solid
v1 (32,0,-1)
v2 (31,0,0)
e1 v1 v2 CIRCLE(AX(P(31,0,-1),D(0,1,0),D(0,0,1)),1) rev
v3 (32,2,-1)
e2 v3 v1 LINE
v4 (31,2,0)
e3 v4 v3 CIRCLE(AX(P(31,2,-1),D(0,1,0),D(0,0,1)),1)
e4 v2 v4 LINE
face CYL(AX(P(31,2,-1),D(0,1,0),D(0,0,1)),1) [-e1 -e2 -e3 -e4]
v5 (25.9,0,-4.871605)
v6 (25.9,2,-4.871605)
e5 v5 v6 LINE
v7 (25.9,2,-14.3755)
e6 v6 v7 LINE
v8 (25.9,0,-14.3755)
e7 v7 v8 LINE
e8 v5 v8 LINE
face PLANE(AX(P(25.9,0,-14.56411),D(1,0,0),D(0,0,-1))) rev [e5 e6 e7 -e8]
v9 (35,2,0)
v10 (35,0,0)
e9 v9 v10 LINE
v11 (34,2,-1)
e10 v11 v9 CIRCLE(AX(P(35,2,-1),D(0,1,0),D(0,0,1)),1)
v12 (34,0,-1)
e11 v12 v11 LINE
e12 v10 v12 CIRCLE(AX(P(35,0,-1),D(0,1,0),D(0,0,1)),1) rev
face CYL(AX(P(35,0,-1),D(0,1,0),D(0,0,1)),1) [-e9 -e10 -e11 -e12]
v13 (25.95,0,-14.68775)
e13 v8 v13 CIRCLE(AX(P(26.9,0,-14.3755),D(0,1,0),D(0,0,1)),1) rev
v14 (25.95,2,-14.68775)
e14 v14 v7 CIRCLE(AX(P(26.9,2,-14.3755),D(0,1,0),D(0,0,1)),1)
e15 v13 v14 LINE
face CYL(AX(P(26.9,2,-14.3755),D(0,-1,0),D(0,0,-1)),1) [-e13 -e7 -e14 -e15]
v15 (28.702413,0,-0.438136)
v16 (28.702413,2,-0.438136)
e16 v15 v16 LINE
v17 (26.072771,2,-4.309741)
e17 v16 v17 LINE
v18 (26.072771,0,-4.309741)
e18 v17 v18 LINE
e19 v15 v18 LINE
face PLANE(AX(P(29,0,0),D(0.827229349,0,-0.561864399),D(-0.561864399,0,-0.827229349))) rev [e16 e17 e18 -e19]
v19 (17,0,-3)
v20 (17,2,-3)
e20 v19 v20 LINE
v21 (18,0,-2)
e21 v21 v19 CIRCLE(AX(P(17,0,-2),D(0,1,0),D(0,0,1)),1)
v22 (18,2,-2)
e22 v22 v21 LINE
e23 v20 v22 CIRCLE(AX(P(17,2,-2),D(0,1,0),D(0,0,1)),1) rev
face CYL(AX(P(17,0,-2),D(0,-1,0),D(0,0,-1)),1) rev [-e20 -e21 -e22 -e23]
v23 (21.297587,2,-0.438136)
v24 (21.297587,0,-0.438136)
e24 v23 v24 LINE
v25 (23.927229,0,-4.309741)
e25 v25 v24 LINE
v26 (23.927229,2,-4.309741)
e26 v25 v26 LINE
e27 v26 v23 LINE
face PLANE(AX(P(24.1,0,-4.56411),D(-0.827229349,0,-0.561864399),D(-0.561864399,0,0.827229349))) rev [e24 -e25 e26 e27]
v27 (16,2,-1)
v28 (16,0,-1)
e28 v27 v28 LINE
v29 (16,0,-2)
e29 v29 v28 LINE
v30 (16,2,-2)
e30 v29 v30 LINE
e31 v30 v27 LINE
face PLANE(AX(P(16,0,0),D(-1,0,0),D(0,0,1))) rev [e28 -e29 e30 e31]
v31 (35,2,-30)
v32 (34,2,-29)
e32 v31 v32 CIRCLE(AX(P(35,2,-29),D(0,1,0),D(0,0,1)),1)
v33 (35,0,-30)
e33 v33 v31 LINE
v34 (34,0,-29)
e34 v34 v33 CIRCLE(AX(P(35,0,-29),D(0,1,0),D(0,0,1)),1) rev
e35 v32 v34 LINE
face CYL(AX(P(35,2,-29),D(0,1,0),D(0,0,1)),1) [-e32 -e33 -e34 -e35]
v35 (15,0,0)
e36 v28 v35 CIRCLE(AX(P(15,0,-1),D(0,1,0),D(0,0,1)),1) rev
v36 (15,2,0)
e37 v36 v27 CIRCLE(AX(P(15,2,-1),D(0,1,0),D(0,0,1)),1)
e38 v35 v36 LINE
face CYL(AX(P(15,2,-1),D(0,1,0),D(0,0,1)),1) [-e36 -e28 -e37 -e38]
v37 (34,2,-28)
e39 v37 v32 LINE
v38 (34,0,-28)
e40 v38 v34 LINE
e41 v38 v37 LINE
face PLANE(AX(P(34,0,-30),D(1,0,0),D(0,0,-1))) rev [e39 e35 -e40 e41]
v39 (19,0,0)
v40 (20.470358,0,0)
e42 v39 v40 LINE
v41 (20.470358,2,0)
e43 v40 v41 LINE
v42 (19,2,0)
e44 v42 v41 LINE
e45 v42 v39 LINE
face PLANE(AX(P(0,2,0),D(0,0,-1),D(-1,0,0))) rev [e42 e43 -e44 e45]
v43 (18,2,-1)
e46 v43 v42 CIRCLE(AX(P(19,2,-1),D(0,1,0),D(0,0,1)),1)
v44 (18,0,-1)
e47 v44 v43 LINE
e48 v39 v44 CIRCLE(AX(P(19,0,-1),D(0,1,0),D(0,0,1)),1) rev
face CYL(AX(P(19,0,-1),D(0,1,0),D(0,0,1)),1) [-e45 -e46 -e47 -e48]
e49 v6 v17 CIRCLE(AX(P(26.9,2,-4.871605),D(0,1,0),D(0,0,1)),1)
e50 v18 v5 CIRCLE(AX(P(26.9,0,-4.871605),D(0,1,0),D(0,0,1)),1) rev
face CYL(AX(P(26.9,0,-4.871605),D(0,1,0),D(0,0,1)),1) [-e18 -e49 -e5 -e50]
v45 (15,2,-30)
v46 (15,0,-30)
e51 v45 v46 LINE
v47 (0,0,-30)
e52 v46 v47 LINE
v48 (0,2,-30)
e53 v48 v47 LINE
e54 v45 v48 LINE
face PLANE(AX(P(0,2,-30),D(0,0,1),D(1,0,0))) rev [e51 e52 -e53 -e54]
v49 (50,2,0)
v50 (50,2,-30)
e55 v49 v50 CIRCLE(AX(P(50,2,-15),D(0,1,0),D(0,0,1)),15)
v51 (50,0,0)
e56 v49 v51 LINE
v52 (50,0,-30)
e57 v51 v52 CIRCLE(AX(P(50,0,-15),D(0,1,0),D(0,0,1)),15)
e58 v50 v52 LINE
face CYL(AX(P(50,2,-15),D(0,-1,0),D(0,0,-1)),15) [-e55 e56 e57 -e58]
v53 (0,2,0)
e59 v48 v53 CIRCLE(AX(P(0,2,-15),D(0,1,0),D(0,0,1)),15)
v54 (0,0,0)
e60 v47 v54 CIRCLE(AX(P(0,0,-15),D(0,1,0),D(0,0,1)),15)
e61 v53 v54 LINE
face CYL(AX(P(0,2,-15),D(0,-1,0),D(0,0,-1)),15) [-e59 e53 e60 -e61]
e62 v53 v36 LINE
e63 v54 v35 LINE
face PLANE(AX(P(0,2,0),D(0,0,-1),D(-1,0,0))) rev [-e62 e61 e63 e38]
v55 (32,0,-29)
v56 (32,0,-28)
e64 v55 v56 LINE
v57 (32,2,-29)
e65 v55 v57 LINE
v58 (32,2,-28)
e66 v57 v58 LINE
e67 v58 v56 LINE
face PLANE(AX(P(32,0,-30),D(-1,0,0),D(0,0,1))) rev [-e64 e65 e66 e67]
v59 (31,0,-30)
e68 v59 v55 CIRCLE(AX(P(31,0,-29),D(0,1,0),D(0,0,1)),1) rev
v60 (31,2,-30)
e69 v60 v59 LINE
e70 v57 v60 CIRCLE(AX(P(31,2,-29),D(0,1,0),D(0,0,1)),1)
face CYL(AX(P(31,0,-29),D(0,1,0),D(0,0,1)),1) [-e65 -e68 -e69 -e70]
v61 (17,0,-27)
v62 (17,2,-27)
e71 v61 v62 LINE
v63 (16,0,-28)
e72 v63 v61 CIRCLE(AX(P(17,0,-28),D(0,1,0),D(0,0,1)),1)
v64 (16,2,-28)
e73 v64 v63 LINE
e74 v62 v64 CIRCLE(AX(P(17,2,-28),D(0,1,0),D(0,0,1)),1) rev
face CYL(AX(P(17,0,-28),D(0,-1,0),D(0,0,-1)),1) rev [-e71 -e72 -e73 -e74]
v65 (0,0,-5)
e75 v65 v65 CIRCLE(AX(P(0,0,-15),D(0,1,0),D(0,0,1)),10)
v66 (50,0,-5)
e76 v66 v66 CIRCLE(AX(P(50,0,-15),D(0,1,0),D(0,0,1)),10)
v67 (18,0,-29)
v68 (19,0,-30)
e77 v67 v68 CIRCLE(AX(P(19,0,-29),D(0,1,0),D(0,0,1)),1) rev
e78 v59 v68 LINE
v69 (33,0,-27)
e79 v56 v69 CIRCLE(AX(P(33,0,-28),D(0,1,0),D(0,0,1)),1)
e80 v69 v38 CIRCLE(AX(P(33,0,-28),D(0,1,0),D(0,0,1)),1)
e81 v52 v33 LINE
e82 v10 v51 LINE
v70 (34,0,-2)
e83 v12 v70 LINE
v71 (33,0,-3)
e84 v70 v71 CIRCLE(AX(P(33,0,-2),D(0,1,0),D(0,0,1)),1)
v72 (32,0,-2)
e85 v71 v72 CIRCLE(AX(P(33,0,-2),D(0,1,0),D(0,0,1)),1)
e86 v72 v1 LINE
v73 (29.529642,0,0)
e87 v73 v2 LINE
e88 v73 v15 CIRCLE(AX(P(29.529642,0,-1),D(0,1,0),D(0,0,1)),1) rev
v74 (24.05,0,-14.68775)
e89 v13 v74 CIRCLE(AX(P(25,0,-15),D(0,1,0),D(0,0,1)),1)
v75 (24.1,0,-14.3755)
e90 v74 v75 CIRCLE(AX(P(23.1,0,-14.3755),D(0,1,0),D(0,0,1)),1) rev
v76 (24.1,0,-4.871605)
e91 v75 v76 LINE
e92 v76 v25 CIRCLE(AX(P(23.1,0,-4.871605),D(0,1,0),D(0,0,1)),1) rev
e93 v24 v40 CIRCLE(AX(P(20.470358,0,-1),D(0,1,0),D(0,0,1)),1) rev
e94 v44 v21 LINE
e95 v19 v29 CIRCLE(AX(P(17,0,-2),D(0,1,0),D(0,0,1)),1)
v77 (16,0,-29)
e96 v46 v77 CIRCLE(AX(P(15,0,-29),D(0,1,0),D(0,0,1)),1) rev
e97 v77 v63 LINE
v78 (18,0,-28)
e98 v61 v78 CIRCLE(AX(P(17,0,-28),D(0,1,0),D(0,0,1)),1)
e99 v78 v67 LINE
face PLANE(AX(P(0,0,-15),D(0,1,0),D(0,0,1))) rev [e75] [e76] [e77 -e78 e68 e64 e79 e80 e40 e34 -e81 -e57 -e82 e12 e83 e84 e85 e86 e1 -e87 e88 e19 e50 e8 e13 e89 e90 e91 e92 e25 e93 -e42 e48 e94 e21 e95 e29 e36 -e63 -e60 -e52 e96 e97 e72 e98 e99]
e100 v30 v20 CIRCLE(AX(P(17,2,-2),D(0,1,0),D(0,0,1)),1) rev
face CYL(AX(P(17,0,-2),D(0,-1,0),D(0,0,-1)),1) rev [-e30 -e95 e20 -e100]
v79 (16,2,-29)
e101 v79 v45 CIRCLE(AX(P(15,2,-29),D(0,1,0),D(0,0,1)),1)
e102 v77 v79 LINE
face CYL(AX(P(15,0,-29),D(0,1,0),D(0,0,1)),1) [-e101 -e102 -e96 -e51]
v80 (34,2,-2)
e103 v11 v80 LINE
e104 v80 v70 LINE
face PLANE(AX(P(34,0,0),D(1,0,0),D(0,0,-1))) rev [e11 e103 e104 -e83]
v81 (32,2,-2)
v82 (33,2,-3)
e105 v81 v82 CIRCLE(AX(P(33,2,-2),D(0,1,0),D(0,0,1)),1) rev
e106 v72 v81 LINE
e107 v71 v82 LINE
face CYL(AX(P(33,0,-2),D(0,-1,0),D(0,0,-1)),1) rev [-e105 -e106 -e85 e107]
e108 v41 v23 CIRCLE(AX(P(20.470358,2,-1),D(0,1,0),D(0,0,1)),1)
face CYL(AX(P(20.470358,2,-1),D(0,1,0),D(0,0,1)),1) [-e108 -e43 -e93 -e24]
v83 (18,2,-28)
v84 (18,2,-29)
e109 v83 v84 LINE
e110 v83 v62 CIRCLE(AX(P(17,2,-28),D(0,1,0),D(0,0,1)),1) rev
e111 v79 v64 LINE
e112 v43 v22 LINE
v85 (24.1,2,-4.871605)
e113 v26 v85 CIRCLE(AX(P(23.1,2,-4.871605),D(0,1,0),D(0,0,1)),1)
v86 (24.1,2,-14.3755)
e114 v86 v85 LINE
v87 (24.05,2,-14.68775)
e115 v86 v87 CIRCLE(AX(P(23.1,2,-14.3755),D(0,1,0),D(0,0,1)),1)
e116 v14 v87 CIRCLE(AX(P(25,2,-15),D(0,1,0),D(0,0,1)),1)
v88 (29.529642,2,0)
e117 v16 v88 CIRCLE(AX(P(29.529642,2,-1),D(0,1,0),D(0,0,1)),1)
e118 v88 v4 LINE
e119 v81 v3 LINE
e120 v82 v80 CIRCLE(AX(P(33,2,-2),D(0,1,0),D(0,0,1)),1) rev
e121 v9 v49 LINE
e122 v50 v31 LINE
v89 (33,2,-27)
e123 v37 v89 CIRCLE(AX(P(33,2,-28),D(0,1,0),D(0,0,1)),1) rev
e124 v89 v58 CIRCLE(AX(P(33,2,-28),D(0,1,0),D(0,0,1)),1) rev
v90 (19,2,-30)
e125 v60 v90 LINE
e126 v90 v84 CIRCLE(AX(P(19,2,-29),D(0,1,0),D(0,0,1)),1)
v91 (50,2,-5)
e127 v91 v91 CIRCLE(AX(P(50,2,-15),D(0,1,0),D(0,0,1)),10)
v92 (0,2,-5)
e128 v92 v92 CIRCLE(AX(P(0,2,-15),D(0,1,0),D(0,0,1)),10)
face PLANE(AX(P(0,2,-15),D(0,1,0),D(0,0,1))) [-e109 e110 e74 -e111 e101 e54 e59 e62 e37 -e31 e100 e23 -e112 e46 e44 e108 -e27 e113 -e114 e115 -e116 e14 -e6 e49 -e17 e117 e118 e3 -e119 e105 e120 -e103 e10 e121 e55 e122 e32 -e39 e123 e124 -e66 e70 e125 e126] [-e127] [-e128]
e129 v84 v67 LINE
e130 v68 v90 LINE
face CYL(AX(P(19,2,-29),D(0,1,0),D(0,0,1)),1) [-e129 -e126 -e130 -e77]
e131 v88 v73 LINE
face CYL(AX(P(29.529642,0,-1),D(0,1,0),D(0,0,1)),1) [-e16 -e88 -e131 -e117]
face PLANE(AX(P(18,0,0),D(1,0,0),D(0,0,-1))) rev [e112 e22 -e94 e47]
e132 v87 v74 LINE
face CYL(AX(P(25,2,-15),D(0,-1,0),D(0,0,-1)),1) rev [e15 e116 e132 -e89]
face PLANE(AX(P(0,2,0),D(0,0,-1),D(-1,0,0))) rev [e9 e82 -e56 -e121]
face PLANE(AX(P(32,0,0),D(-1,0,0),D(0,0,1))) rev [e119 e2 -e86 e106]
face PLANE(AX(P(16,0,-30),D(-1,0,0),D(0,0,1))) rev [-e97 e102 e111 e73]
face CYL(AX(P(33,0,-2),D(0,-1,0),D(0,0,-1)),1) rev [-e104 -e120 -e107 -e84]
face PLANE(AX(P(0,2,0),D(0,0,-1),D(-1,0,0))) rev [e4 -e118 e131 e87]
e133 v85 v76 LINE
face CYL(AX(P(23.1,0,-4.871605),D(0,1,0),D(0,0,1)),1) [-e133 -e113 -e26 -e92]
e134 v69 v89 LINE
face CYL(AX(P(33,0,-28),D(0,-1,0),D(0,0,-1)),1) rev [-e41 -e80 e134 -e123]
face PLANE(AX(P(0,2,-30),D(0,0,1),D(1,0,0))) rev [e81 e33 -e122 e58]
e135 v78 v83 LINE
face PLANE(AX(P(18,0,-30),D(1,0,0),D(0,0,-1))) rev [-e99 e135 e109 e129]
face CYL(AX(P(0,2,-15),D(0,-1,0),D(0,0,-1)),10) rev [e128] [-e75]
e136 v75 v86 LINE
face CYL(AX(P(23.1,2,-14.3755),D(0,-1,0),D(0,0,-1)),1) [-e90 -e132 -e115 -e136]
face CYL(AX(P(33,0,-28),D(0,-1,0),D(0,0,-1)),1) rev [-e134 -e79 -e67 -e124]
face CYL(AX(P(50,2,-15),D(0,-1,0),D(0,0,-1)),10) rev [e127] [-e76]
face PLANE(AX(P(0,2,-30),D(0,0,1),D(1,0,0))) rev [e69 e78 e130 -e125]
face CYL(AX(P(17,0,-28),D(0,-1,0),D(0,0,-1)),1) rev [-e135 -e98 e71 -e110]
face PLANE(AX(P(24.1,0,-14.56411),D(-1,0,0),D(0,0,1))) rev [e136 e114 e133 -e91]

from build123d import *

# Parameters (mm, degrees)
SKETCH1_R           = 10
SKETCH1_R_2         = 1
BOSS_EXTRUDE1_DEPTH = 2
SKETCH2_W           = 2
SKETCH2_H           = 3
CUT_EXTRUDE1_DEPTH  = 72.617037079
FILLET1_START       = -1
FILLET1_DEPTH       = 4
FILLET1_2_DEPTH     = 2
CUT_EXTRUDE2_DEPTH  = 72.617037079
FILLET2_R           = 1


with BuildPart() as part:
    # Sketch1 → Boss-Extrude1 (new body)
    with BuildSketch(Plane(origin=(0, 0, 0), x_dir=(1, 0, 0), z_dir=(0, 1, 0))):
        with BuildLine():
            Line((0, 0), (50, 0))
            ThreePointArc((50, 0), (65, 15), (50, 30))
            Line((50, 30), (0, 30))
            ThreePointArc((0, 30), (-15, 15), (0, 0))
        make_face()
        with Locations(Location((0, 15, 0), (0, 0, 270))):
            Circle(SKETCH1_R, mode=Mode.SUBTRACT)
        with Locations(Location((50, 15, 0), (0, 0, 270))):
            Circle(SKETCH1_R, mode=Mode.SUBTRACT)
        with Locations(Location((25, 15, 0), (0, 0, 270))):
            Circle(SKETCH1_R_2, mode=Mode.SUBTRACT)
    extrude(amount=BOSS_EXTRUDE1_DEPTH)

    # Sketch2 → Cut-Extrude1 (cut, through all)
    with BuildSketch(Plane(origin=(0, 2, 0), x_dir=(1, 0, 0), z_dir=(0, 1, 0))):
        with Locations((17, 28.5)):
            Rectangle(SKETCH2_W, SKETCH2_H)
        with Locations((33, 28.5)):
            Rectangle(SKETCH2_W, SKETCH2_H)
        with Locations((17, 1.5)):
            Rectangle(SKETCH2_W, SKETCH2_H)
        with Locations((33, 1.5)):
            Rectangle(SKETCH2_W, SKETCH2_H)
    extrude(amount=-CUT_EXTRUDE1_DEPTH, mode=Mode.SUBTRACT)

    # Fillet1: read off the stored shape, not the designer's step
    # Fillet1 outline → Fillet1 (cut)
    with BuildSketch(Plane(origin=(0, 0, 0), x_dir=(1, 0, 0), z_dir=(0, 1, 0)).offset(FILLET1_START)):
        with BuildLine():
            ThreePointArc((35, 0), (34.292893219, 0.292893219), (34, 1))
            Line((34, 1), (34, 0))
            Line((34, 0), (35, 0))
        make_face()
        with BuildLine():
            ThreePointArc((32, 1), (31.707106781, 0.292893219), (31, 0))
            Line((31, 0), (32, 0))
            Line((32, 0), (32, 1))
        make_face()
        with BuildLine():
            ThreePointArc((19, 0), (18.292893219, 0.292893219), (18, 1))
            Line((18, 1), (18, 0))
            Line((18, 0), (19, 0))
        make_face()
        with BuildLine():
            ThreePointArc((16, 1), (15.707106781, 0.292893219), (15, 0))
            Line((15, 0), (16, 0))
            Line((16, 0), (16, 1))
        make_face()
        with BuildLine():
            ThreePointArc((15, 30), (15.707106781, 29.707106781), (16, 29))
            Line((16, 29), (16, 30))
            Line((16, 30), (15, 30))
        make_face()
        with BuildLine():
            ThreePointArc((18, 29), (18.292893219, 29.707106781), (19, 30))
            Line((19, 30), (18, 30))
            Line((18, 30), (18, 29))
        make_face()
        with BuildLine():
            ThreePointArc((31, 30), (31.707106781, 29.707106781), (32, 29))
            Line((32, 29), (32, 30))
            Line((32, 30), (31, 30))
        make_face()
        with BuildLine():
            ThreePointArc((34, 29), (34.292893219, 29.707106781), (35, 30))
            Line((35, 30), (34, 30))
            Line((34, 30), (34, 29))
        make_face()
    extrude(amount=FILLET1_DEPTH, mode=Mode.SUBTRACT)

    # Fillet1 2 outline → Fillet1 2 (add)
    with BuildSketch(Plane(origin=(0, 0, 0), x_dir=(1, 0, 0), z_dir=(0, 1, 0))):
        with BuildLine():
            Line((34, 3), (33, 3))
            ThreePointArc((33, 3), (33.707106781, 2.707106781), (34, 2))
            Line((34, 2), (34, 3))
        make_face()
        with BuildLine():
            Line((32, 3), (32, 2))
            ThreePointArc((32, 2), (32.292893219, 2.707106781), (33, 3))
            Line((33, 3), (32, 3))
        make_face()
        with BuildLine():
            Line((18, 3), (17, 3))
            ThreePointArc((17, 3), (17.707106781, 2.707106781), (18, 2))
            Line((18, 2), (18, 3))
        make_face()
        with BuildLine():
            Line((16, 3), (16, 2))
            ThreePointArc((16, 2), (16.292893219, 2.707106781), (17, 3))
            Line((17, 3), (16, 3))
        make_face()
        with BuildLine():
            Line((16, 27), (17, 27))
            ThreePointArc((17, 27), (16.292893219, 27.292893219), (16, 28))
            Line((16, 28), (16, 27))
        make_face()
        with BuildLine():
            Line((18, 27), (18, 28))
            ThreePointArc((18, 28), (17.707106781, 27.292893219), (17, 27))
            Line((17, 27), (18, 27))
        make_face()
        with BuildLine():
            Line((32, 27), (33, 27))
            ThreePointArc((33, 27), (32.292893219, 27.292893219), (32, 28))
            Line((32, 28), (32, 27))
        make_face()
        with BuildLine():
            Line((34, 27), (34, 28))
            ThreePointArc((34, 28), (33.707106781, 27.292893219), (33, 27))
            Line((33, 27), (34, 27))
        make_face()
    extrude(amount=FILLET1_2_DEPTH)

    # Sketch3 → Cut-Extrude2 (cut, through all)
    with BuildSketch(Plane(origin=(0, 2, 0), x_dir=(1, 0, 0), z_dir=(0, 1, 0))):
        Polygon((24.1, 14.564110106), (25.9, 14.564110106), (25.9, 4.564110106), (29, 0), (21, 0), (24.1, 4.564110106), align=None)
    extrude(amount=-CUT_EXTRUDE2_DEPTH, mode=Mode.SUBTRACT)

    # Fillet2
    fillet2_edges = [part.edges().sort_by_distance(p)[0] for p in [
        (24.1, 1, -4.564110106),
        (24.1, 1, -14.564110106),
        (25.9, 1, -14.564110106),
        (25.9, 1, -4.564110106),
        (29, 1, 0),
        (21, 1, 0),
    ]]
    fillet(fillet2_edges, radius=FILLET2_R)


solid = part.part
